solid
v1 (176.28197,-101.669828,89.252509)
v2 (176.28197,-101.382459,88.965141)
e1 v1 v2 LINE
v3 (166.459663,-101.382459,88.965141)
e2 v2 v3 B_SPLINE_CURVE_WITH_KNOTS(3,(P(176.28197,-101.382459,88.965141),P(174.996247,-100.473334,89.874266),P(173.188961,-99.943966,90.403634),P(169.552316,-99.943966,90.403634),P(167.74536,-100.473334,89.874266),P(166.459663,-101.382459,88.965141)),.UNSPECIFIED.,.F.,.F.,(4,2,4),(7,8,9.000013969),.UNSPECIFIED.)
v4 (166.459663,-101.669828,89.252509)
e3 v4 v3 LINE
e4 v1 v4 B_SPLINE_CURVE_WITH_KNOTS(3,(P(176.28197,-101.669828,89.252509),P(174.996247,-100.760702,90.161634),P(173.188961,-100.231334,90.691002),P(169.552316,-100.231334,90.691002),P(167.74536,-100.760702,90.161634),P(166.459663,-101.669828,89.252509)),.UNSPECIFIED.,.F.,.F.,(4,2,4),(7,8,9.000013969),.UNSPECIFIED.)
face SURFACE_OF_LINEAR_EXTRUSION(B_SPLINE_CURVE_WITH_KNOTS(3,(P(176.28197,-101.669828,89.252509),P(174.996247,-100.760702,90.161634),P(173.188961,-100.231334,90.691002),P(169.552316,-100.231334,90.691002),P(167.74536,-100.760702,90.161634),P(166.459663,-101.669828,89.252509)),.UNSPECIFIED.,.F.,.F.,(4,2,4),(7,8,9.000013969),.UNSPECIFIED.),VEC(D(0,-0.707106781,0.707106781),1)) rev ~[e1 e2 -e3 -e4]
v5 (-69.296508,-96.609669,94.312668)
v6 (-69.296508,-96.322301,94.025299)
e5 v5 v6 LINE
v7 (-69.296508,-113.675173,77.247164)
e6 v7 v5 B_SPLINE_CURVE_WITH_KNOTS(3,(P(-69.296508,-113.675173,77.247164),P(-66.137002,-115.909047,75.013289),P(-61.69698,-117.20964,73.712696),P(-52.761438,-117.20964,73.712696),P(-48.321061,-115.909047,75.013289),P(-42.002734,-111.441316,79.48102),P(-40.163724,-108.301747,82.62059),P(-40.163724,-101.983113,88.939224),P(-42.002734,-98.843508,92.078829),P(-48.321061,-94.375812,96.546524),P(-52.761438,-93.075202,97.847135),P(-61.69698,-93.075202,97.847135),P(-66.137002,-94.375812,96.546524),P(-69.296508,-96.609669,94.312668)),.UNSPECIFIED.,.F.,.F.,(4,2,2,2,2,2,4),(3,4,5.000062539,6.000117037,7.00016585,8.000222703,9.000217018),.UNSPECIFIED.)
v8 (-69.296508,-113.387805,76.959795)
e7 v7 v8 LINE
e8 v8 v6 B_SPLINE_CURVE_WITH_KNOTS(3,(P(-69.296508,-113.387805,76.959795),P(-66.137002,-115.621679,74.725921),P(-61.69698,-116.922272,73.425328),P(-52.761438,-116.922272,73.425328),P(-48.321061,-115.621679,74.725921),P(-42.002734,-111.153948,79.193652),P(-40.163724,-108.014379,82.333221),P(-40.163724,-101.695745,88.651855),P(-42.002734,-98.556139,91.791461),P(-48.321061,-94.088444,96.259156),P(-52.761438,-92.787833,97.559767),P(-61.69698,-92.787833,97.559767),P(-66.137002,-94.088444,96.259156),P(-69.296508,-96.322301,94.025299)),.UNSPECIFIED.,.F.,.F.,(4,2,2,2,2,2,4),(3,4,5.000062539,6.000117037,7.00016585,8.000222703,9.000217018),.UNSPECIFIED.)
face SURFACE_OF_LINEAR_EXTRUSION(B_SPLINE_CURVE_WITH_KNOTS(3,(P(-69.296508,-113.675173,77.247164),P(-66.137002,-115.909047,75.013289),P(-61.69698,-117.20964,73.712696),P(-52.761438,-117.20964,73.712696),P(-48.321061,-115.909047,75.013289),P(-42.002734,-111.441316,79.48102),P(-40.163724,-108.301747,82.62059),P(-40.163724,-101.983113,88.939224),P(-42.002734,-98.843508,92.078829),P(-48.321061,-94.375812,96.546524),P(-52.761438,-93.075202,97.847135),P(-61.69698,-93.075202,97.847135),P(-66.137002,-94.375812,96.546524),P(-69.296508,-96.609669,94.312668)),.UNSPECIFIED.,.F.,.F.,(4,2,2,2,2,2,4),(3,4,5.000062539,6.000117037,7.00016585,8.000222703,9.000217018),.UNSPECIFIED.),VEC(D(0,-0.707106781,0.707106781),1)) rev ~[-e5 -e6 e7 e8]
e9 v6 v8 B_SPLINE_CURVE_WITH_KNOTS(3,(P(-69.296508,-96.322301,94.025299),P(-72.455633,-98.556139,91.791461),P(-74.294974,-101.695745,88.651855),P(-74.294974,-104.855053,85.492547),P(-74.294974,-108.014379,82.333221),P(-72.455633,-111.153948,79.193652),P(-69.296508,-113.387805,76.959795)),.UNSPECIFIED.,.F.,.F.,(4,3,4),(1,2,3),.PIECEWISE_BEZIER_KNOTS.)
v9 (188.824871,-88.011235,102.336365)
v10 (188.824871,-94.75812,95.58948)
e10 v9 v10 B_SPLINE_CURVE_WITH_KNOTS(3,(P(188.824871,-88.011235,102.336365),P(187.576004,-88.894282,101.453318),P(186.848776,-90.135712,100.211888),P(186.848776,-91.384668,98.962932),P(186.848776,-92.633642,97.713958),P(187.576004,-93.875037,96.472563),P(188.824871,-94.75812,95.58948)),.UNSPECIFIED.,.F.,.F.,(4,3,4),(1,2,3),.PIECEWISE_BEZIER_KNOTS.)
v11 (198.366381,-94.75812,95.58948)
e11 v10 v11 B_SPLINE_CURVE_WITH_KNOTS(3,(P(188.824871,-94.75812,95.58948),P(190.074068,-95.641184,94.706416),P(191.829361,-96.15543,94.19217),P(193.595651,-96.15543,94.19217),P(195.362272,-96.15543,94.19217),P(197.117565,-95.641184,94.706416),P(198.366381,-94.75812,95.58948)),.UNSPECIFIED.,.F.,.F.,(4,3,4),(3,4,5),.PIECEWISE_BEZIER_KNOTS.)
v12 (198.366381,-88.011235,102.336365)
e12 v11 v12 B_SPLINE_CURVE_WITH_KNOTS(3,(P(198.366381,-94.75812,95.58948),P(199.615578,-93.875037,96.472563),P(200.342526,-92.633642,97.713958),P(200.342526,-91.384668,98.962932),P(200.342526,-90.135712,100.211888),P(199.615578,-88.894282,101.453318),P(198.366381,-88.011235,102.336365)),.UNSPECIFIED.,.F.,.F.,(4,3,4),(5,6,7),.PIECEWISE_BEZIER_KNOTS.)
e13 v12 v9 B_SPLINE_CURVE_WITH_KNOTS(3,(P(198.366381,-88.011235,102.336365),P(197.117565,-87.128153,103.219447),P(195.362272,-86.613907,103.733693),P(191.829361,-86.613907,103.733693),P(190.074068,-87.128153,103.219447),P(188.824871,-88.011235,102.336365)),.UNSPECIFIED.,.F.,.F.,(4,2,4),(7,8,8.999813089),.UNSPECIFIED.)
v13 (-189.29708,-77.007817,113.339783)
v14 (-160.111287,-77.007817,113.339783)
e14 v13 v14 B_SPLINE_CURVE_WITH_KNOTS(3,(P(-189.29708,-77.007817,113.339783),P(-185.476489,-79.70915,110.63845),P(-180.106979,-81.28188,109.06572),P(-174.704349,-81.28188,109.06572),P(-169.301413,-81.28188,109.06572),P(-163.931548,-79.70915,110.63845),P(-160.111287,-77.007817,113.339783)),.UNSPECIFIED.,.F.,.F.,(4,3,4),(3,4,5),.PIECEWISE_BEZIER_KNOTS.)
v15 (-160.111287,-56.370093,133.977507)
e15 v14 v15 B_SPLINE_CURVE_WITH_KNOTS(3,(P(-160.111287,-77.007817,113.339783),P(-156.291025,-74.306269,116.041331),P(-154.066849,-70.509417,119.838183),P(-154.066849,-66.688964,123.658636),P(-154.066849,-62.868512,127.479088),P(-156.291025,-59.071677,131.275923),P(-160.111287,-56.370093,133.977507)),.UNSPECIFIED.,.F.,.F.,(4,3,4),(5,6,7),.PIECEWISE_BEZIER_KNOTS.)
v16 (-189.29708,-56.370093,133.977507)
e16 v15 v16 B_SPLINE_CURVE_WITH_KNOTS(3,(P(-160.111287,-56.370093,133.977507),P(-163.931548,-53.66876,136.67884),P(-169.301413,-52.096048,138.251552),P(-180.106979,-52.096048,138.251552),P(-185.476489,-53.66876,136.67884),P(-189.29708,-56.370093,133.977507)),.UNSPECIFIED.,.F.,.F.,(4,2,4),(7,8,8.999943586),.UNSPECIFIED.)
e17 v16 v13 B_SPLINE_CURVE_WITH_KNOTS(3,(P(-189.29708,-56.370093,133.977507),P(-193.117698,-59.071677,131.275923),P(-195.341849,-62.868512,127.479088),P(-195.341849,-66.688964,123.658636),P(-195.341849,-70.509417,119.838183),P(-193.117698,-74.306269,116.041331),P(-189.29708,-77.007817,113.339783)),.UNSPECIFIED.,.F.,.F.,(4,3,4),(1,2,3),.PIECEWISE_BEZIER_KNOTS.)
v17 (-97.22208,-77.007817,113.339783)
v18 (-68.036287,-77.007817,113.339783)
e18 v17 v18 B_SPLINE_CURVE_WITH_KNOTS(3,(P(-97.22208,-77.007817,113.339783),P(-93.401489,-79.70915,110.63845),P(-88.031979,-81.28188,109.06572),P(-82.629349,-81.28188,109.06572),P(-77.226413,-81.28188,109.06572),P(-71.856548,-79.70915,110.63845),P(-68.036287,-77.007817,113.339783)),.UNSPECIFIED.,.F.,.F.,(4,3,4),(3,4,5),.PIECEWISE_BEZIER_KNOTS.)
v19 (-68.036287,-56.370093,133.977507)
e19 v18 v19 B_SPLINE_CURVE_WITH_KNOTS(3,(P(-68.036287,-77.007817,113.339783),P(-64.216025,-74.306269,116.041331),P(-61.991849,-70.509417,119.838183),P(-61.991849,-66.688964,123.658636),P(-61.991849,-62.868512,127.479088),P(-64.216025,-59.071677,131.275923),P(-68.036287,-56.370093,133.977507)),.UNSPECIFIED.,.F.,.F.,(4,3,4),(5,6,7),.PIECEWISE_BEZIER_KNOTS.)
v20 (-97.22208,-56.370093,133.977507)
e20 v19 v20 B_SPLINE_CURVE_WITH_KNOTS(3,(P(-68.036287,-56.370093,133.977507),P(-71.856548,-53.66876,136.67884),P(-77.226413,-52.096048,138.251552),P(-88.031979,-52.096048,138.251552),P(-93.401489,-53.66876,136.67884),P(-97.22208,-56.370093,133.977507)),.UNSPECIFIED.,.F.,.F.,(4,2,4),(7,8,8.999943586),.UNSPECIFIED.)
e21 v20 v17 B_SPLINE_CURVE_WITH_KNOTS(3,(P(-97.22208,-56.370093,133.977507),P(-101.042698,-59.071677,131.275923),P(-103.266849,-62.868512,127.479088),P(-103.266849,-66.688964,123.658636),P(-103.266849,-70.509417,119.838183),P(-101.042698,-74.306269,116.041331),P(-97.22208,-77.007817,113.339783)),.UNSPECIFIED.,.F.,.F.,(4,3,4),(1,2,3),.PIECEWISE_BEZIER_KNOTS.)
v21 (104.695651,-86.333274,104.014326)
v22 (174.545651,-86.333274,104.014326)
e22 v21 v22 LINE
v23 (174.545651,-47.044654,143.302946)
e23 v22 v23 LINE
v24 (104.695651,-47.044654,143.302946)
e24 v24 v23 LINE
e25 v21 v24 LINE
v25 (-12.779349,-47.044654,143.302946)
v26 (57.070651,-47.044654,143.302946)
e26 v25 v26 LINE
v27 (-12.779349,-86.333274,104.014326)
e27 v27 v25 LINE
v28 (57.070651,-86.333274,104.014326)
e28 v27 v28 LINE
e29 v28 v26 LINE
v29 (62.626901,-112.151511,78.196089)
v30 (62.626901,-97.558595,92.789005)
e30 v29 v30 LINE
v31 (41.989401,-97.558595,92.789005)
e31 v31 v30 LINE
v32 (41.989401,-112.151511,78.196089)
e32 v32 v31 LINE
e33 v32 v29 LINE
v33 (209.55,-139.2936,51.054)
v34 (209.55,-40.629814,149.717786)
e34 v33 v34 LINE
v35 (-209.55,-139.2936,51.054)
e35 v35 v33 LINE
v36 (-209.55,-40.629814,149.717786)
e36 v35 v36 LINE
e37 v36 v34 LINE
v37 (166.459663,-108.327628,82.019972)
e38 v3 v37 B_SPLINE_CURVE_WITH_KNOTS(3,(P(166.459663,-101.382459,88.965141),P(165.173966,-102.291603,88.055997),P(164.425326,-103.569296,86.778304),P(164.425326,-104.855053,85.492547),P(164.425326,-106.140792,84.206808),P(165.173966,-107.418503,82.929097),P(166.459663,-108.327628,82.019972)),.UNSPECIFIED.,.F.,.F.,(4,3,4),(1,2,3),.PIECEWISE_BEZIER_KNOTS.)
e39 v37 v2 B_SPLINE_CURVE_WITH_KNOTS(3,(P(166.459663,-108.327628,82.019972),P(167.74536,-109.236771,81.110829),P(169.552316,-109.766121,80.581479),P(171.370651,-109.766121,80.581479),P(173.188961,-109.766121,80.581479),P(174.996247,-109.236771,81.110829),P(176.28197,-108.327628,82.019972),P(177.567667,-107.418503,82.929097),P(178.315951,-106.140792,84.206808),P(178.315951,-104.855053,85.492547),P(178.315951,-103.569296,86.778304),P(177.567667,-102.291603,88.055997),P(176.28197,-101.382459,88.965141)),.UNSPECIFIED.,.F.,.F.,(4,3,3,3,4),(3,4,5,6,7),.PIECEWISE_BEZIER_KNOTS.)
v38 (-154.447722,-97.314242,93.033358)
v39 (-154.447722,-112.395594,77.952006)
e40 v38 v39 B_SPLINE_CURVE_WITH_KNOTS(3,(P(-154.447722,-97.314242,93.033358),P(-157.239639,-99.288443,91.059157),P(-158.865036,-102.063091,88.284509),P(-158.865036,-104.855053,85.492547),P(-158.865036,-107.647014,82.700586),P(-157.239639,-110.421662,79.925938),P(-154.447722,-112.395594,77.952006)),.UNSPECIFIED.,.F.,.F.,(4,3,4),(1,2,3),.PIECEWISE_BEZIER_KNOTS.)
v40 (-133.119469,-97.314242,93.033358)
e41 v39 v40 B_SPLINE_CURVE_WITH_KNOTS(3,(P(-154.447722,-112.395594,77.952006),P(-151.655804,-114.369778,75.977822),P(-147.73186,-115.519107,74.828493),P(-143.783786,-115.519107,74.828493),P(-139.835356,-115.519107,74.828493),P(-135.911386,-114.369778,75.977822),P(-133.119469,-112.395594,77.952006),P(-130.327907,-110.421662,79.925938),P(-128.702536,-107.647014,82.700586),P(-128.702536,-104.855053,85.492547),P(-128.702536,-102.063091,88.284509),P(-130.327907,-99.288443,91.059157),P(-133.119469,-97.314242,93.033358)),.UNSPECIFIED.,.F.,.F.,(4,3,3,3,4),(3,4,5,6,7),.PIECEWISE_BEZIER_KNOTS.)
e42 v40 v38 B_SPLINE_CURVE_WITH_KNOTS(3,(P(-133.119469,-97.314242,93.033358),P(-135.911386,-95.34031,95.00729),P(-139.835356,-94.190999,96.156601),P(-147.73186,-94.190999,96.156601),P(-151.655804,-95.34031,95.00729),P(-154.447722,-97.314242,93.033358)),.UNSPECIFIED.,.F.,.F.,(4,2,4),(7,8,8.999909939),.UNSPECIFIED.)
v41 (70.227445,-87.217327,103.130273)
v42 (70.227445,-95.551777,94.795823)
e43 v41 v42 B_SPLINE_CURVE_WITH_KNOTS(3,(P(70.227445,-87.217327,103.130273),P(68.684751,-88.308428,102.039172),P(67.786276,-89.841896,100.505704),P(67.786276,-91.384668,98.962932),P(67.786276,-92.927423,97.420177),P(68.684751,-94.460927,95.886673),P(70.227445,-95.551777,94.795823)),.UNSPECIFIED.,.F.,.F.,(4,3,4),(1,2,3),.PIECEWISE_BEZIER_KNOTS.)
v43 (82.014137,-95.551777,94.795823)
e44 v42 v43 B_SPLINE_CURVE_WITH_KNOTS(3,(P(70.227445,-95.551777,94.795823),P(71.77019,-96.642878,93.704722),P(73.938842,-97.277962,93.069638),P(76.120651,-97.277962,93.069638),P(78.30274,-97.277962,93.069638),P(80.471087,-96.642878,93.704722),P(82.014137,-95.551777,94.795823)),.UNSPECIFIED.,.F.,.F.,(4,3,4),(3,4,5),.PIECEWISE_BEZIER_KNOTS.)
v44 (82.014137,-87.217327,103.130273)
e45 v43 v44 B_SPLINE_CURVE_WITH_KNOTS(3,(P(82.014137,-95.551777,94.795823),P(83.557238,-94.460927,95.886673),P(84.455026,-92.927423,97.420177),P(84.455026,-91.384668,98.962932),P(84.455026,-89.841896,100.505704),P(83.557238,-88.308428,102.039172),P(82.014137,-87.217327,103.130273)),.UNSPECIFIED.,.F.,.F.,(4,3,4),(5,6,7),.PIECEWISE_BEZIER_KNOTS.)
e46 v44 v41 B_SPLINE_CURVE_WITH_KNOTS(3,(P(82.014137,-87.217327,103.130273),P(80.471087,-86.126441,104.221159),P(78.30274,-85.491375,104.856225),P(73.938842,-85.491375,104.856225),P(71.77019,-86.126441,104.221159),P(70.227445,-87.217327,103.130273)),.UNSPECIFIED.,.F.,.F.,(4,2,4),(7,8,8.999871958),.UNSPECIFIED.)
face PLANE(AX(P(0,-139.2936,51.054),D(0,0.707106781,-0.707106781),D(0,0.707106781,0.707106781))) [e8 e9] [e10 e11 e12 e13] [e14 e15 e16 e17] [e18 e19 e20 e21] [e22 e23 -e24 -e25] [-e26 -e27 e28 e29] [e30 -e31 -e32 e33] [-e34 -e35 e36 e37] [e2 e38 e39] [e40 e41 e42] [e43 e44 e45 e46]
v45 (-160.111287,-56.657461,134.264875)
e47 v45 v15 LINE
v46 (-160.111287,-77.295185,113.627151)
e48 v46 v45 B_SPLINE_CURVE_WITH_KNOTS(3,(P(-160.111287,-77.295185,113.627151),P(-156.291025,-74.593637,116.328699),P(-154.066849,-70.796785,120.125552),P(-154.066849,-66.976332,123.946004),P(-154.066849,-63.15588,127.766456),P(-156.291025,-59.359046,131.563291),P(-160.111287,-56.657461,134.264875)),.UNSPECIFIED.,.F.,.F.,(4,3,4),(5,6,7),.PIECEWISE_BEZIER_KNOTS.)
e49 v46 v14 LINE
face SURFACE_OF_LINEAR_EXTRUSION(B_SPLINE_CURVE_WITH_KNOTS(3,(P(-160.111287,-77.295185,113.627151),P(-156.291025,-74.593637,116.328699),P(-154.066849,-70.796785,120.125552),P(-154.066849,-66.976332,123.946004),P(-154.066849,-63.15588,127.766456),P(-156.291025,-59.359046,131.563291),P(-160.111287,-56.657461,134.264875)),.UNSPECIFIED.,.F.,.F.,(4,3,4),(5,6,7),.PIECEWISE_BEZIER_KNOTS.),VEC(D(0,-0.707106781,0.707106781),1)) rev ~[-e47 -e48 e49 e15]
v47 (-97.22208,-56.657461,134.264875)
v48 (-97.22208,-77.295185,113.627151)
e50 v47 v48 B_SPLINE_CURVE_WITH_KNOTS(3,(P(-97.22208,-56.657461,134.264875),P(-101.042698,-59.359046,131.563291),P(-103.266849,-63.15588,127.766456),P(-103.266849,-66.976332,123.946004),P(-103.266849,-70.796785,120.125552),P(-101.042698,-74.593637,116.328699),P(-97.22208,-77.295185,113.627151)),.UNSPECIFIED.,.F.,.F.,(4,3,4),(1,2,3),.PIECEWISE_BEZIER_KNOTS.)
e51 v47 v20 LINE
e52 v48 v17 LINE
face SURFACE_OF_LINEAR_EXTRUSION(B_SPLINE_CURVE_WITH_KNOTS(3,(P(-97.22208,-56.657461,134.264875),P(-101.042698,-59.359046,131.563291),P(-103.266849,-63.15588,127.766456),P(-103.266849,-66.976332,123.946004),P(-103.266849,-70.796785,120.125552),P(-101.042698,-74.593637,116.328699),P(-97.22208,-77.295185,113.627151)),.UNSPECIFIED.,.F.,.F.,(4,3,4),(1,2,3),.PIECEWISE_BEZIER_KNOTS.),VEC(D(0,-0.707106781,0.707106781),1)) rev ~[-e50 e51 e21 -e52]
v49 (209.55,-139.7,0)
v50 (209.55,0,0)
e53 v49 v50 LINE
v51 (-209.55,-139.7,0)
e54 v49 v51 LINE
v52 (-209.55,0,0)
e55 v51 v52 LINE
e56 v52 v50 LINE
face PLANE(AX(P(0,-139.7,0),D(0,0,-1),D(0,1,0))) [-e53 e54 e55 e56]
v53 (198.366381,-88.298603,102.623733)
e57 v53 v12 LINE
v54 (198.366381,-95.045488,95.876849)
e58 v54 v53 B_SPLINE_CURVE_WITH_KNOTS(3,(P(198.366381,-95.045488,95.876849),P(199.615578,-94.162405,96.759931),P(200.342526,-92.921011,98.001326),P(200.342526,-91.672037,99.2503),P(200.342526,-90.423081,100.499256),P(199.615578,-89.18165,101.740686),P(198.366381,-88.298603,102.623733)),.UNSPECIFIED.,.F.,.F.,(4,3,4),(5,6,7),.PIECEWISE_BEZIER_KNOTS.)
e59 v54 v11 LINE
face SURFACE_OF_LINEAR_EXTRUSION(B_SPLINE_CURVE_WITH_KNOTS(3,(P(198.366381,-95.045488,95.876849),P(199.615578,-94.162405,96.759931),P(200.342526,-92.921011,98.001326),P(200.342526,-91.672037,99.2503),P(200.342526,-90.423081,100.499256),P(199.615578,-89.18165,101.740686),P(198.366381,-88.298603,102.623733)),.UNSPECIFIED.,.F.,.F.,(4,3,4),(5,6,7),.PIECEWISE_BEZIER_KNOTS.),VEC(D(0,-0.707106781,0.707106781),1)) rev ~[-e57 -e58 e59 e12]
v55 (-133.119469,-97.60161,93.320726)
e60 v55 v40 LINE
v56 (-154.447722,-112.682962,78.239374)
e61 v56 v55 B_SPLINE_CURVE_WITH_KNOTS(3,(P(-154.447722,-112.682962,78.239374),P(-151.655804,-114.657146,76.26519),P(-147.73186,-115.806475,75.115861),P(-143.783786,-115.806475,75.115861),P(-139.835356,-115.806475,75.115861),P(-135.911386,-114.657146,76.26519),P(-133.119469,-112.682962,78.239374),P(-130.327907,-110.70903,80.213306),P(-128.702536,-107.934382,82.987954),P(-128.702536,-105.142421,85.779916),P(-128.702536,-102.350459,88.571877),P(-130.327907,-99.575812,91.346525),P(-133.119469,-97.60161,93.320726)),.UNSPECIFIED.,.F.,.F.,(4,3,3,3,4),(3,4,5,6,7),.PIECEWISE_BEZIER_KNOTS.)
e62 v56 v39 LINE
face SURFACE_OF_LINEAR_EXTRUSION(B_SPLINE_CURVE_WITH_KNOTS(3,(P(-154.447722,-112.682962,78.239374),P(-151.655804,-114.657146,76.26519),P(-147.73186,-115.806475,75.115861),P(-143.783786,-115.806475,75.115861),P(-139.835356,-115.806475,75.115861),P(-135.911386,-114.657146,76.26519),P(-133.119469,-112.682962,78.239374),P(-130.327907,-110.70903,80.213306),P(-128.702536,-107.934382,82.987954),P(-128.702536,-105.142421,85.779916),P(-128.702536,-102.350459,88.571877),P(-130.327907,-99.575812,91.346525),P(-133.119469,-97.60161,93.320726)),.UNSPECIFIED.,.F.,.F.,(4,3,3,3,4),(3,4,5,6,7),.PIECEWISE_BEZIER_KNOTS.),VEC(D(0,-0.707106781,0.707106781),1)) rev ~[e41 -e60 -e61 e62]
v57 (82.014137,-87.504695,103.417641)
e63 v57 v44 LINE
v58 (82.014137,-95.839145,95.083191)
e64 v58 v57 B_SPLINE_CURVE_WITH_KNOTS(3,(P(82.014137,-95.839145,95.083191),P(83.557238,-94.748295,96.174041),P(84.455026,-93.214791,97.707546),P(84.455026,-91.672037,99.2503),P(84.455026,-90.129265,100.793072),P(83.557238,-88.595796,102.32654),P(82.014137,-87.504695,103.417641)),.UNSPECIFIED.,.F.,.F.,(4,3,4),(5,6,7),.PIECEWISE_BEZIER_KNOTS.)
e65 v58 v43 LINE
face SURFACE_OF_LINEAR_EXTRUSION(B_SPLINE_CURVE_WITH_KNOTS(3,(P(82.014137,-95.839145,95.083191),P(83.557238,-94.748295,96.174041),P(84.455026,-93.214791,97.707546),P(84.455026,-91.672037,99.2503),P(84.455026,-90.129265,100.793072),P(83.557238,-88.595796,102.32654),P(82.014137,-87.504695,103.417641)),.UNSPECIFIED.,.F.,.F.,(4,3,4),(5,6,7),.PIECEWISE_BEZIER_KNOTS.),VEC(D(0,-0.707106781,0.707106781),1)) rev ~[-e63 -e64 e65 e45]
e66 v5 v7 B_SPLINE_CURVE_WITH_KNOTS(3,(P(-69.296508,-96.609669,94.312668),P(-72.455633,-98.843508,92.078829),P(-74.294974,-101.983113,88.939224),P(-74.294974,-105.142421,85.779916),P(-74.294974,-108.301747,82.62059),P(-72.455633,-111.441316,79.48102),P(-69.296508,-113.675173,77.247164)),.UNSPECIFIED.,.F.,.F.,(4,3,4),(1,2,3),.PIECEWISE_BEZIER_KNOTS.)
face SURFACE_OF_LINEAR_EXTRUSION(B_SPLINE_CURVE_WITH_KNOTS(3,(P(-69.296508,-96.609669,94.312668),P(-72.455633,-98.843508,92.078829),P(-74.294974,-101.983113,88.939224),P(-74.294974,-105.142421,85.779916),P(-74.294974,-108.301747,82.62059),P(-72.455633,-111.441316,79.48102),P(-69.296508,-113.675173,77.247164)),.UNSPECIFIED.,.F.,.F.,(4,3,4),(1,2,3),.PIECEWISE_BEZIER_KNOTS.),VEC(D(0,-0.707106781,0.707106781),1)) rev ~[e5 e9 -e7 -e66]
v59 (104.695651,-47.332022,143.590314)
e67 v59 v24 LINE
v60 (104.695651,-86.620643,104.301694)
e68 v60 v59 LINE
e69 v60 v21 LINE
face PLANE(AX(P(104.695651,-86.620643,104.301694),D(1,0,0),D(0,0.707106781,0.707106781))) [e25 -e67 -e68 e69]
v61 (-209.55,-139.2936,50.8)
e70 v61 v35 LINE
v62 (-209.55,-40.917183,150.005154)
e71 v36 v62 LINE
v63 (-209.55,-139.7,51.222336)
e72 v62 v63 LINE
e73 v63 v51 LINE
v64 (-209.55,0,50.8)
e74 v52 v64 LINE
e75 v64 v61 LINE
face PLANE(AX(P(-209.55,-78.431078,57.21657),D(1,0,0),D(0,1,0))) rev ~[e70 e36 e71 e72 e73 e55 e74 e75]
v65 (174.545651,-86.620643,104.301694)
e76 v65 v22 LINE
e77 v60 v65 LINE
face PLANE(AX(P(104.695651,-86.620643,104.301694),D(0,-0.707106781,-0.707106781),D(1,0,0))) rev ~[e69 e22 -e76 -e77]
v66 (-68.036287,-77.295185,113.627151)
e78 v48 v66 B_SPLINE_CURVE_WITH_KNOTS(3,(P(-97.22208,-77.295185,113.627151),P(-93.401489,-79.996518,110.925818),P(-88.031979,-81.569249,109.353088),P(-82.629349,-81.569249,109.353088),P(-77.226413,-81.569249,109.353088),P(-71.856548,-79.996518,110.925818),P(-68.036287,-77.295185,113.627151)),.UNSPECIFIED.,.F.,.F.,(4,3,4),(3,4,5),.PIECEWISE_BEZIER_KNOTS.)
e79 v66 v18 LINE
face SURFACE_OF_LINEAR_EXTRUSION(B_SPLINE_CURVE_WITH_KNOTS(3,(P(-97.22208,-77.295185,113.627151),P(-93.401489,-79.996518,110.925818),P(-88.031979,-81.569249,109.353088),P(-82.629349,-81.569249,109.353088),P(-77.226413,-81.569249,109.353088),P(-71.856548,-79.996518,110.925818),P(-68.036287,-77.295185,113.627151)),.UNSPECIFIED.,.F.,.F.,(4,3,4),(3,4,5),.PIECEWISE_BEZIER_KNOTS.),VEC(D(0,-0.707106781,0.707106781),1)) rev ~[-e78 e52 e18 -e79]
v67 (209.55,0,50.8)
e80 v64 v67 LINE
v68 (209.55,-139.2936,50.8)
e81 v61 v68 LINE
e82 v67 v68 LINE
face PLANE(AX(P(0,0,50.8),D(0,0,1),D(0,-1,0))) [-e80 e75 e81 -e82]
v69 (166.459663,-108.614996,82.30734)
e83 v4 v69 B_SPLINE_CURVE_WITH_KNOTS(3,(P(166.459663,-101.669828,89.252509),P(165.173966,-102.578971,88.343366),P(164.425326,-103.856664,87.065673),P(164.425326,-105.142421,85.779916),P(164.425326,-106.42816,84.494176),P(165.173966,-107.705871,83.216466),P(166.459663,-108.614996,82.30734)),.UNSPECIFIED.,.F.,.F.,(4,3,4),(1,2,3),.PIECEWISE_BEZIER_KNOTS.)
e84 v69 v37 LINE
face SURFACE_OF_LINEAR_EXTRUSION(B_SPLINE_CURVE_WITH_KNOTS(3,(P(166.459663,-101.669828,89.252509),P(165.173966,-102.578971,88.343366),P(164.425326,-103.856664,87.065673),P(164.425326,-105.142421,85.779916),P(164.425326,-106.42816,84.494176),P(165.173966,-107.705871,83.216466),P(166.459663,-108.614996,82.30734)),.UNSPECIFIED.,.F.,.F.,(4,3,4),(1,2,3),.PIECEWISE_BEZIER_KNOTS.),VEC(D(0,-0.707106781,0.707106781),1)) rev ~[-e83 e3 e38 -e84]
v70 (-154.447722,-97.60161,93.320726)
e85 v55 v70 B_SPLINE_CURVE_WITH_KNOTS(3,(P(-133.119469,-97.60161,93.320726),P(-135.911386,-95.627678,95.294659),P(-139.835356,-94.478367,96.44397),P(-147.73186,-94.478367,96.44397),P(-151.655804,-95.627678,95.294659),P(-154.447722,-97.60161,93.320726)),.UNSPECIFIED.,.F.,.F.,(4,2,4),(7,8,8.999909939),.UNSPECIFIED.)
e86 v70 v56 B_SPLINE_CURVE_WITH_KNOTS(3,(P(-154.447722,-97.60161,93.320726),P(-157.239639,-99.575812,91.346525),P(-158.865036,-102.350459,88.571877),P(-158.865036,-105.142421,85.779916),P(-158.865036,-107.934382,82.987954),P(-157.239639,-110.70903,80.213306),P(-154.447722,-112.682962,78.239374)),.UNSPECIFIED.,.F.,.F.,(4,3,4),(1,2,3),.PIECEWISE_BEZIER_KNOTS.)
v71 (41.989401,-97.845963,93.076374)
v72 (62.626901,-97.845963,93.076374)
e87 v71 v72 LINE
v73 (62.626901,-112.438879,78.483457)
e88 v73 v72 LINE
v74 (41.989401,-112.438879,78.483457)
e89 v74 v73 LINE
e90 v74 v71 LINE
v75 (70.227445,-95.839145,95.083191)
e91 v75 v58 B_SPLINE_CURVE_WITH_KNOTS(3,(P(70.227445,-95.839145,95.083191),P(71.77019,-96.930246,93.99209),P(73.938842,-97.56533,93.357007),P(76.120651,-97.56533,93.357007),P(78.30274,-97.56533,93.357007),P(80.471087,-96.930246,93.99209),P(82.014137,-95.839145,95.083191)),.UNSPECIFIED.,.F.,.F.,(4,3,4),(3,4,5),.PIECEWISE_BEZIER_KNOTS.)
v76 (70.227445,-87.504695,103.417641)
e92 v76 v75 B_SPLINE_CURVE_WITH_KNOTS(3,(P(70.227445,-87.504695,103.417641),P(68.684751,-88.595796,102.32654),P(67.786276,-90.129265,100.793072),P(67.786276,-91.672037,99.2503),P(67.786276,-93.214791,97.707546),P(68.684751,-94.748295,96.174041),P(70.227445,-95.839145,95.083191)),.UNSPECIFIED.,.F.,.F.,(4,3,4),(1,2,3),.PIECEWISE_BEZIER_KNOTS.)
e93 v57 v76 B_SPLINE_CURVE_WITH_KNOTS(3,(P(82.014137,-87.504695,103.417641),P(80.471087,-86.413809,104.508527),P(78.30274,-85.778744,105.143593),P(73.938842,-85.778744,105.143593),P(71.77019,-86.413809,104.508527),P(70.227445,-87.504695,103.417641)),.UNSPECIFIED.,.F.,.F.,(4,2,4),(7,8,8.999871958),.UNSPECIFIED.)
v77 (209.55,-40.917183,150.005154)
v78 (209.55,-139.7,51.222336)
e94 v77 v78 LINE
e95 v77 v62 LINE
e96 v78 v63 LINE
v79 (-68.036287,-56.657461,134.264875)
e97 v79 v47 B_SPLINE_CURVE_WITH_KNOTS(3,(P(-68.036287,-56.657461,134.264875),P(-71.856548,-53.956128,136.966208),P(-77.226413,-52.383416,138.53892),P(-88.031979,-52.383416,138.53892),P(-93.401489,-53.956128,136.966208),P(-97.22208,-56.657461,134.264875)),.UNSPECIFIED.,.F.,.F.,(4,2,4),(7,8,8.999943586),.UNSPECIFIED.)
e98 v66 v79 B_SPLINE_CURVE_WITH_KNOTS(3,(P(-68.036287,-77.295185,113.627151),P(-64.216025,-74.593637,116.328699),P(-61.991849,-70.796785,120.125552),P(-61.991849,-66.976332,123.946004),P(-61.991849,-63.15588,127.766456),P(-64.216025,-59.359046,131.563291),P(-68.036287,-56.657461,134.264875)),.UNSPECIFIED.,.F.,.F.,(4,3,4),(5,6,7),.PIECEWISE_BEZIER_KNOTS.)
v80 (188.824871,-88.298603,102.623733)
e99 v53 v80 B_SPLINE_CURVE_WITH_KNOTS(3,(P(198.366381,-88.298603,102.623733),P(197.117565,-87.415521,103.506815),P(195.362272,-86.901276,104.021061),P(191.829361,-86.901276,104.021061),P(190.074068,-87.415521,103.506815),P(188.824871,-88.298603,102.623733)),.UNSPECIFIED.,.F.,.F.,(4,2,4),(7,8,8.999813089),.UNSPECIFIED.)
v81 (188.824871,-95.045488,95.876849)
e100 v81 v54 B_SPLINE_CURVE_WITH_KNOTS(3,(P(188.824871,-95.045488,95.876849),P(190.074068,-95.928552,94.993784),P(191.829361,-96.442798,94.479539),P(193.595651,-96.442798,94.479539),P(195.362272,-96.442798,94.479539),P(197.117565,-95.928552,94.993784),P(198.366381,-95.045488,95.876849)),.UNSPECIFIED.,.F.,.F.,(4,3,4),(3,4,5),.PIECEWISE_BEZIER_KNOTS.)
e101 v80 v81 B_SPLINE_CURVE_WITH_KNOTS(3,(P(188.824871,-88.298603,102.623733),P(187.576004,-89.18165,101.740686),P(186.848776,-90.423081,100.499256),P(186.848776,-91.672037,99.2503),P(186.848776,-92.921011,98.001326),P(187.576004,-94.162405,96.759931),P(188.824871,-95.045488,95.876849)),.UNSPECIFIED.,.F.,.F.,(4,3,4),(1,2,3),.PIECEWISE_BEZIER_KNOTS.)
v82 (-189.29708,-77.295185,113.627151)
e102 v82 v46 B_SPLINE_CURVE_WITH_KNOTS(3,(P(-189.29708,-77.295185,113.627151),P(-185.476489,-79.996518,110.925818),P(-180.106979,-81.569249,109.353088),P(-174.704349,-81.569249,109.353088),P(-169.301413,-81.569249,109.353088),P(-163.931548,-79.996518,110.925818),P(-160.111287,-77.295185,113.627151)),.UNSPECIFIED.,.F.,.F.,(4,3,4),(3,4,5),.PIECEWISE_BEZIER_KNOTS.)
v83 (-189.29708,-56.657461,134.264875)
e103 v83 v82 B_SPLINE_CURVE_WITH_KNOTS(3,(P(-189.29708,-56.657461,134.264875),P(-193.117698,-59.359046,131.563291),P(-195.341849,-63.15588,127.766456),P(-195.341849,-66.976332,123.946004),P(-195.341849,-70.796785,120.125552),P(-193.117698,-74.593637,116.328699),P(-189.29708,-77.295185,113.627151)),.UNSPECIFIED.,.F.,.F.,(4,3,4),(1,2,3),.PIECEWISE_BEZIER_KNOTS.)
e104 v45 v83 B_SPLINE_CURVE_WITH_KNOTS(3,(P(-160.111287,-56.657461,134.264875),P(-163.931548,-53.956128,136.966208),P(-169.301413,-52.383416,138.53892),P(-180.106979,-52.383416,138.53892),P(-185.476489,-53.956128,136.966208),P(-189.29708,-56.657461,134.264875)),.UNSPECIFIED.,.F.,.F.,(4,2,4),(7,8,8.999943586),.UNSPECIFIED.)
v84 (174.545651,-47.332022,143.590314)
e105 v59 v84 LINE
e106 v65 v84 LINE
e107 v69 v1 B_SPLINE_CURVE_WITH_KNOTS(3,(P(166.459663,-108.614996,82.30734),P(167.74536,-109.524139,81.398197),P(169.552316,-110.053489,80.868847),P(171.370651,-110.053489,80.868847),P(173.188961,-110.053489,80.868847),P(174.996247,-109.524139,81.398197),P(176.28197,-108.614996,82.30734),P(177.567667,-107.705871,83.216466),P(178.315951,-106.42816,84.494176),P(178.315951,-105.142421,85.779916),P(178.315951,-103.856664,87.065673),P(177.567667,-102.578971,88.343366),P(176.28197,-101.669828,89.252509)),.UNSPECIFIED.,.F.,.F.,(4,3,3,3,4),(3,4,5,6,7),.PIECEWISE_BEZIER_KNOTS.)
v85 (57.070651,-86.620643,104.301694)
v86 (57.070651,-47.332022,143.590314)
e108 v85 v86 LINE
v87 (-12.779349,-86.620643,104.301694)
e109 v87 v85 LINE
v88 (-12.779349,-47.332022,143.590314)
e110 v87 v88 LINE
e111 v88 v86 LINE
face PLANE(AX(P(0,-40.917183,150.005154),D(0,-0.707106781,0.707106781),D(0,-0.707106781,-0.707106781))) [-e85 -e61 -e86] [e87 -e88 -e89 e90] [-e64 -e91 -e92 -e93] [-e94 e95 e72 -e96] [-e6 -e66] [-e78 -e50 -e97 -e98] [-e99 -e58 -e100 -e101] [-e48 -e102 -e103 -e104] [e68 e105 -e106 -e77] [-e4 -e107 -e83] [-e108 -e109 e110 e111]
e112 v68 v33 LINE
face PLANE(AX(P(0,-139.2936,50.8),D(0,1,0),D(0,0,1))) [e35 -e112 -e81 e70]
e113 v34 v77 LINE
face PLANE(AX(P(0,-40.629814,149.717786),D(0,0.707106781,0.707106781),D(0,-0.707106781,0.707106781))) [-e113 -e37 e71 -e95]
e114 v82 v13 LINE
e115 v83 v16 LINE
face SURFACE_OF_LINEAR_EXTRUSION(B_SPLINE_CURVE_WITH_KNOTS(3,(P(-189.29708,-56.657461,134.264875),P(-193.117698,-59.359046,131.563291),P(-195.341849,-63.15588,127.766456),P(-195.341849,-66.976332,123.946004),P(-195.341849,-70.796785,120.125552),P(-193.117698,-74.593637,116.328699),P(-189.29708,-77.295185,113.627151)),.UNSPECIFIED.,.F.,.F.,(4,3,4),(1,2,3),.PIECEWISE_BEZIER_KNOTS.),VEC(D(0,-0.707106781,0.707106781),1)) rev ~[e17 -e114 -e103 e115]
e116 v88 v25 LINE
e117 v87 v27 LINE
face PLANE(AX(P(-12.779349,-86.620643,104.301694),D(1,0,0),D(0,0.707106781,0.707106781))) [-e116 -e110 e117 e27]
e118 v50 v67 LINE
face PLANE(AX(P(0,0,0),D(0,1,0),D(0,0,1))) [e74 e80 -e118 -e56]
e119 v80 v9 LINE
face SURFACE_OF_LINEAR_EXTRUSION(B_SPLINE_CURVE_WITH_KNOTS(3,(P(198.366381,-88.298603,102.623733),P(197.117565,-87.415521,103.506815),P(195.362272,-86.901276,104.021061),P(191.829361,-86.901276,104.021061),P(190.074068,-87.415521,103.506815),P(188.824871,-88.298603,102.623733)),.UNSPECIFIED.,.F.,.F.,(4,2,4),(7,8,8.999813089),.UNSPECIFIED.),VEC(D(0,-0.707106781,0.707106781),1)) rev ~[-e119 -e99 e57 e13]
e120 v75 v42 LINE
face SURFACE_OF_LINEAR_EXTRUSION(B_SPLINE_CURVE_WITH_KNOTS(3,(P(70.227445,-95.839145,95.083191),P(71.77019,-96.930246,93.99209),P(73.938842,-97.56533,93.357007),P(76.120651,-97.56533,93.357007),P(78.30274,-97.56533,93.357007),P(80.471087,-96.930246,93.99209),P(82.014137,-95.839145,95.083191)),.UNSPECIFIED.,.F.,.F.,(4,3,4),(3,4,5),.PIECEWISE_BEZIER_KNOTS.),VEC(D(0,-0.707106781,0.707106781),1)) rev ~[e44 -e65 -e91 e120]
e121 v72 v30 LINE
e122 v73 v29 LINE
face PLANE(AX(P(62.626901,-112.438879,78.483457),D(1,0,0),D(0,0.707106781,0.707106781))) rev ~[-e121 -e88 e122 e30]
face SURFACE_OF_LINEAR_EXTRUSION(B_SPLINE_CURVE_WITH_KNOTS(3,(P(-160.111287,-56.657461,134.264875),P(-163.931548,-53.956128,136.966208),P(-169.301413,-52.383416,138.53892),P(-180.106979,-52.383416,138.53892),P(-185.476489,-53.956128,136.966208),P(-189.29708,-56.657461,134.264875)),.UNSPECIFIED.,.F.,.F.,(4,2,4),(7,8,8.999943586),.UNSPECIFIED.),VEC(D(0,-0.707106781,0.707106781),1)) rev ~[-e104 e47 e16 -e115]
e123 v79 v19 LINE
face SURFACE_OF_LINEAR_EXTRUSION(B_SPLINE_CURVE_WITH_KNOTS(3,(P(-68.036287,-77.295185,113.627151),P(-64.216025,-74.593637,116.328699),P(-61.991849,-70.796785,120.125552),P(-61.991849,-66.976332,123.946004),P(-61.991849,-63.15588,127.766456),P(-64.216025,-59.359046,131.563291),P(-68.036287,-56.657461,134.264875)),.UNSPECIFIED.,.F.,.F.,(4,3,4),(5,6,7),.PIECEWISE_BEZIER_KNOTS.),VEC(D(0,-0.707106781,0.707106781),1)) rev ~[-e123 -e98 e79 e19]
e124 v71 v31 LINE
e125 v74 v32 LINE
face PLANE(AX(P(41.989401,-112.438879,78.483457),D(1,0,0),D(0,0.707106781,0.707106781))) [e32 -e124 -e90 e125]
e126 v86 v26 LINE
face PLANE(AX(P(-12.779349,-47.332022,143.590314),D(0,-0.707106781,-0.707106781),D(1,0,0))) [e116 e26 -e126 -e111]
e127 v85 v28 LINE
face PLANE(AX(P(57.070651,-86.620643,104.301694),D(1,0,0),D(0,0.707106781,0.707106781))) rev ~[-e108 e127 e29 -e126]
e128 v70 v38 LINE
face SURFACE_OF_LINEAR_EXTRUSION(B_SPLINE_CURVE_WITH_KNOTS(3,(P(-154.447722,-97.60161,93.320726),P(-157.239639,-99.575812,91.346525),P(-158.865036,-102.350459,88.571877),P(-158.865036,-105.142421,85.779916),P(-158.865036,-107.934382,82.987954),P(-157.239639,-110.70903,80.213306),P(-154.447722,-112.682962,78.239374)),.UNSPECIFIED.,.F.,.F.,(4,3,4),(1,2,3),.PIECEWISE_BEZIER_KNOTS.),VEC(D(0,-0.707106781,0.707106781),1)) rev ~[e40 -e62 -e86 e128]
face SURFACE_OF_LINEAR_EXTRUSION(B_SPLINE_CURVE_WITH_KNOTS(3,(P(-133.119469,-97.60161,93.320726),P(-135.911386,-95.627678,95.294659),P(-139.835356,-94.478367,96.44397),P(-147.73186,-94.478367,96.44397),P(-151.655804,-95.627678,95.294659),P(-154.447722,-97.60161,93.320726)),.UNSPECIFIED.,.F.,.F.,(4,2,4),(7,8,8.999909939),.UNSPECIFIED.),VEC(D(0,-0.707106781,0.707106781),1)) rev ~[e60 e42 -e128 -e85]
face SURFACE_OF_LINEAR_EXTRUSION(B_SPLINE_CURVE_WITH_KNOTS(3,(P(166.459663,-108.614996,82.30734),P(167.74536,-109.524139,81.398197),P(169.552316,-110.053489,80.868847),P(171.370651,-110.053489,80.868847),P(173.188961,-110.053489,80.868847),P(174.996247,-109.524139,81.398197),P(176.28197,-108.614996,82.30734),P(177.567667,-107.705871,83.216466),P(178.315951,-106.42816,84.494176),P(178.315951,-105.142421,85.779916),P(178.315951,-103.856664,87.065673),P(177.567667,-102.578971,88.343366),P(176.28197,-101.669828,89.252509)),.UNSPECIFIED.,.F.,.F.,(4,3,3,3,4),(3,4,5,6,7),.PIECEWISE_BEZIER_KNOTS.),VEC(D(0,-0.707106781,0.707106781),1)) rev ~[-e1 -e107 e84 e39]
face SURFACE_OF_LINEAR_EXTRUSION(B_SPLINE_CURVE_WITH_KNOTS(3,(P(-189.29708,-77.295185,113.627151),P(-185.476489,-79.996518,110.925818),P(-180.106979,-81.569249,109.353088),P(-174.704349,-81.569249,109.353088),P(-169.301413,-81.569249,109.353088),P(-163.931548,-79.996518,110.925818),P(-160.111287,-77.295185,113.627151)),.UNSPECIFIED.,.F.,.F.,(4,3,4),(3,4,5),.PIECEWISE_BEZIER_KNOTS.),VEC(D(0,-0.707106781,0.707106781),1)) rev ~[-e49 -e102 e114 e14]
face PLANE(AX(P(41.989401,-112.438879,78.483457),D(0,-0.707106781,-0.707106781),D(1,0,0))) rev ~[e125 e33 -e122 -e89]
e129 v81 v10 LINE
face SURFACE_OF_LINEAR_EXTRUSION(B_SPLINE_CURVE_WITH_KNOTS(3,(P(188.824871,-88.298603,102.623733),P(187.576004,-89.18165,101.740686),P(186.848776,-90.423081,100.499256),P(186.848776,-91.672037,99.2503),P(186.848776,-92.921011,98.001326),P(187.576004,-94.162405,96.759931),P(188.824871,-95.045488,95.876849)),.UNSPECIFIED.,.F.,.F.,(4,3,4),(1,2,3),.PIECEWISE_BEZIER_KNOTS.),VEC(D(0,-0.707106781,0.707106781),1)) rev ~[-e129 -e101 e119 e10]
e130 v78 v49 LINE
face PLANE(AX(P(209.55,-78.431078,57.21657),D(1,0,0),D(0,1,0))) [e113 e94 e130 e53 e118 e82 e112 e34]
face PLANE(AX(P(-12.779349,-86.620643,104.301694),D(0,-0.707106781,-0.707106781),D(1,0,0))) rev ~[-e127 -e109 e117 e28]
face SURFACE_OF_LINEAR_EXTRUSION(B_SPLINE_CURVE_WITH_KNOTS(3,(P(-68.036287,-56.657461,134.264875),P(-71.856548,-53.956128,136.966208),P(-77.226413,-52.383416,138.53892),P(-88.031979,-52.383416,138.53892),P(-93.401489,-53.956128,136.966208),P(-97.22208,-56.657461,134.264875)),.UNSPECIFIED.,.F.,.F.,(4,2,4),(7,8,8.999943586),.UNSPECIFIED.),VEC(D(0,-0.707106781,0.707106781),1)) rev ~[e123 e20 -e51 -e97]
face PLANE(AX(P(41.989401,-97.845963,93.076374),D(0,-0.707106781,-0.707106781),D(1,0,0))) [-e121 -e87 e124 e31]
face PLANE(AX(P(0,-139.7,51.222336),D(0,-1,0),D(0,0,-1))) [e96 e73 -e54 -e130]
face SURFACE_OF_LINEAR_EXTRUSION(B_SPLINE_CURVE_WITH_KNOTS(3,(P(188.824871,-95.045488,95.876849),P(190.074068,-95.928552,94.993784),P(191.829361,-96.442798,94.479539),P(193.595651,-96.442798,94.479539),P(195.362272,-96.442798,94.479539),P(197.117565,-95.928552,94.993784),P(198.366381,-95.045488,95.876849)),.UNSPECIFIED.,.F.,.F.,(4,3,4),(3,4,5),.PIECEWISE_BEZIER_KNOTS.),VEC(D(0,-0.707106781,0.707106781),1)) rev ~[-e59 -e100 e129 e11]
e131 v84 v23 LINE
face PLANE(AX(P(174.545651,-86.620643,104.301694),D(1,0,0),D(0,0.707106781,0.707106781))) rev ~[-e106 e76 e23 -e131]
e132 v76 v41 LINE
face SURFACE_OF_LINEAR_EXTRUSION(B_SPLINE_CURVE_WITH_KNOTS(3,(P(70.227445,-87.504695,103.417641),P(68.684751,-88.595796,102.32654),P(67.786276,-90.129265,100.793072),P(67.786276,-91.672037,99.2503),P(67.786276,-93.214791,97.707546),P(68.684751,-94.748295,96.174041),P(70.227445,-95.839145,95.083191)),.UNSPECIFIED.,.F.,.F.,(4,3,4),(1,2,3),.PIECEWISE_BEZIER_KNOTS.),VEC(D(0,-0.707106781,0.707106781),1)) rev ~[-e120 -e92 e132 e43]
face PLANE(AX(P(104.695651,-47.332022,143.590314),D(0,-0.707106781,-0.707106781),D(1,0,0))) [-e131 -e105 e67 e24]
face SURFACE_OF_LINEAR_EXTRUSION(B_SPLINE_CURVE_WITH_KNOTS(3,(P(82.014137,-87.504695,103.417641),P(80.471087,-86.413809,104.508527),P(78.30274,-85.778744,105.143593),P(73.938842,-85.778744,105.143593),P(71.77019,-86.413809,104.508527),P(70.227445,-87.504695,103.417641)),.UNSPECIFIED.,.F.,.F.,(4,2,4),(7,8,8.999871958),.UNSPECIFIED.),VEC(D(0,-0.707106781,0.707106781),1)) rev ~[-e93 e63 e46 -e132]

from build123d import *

# Parameters (mm, degrees)
F1_DEPTH = 209.55
F2_W     = 20.6375
F2_H     = 20.6375
F2_W_2   = 69.85
F2_H_2   = 55.5625
F3_DEPTH = 0.4064


# Not quite as in the source:
# - the dataset's text gives a spline's control points without its knots; the knots are read off the source's solid


with BuildPart() as f1:
    # F0 (on Right) → F1 (new body, symmetric)
    with BuildSketch(Plane.YZ):
        Polygon((-139.7, 0), (0, 0), (0, 50.8), (-139.2936, 50.8), (-139.2936, 51.054), (-40.6298144724, 149.7177855276), (-40.9171826682, 150.0051537235), (-139.7, 51.2223363917), align=None)
    extrude(amount=F1_DEPTH, both=True)

    # F2 (on face) → F3 (cut, through all)
    with BuildSketch(Plane(origin=(0, -95.4611681959, 95.4611681959), x_dir=(1, 0, 0), z_dir=(0, -0.7071067812, 0.7071067812))):
        with Locations((52.3081513166, -13.6913588034)):
            Rectangle(F2_W, F2_H)
        with Locations((139.6206513166, 40.2836411966)):
            Rectangle(F2_W_2, F2_H_2)
        with Locations((22.1456513166, 40.2836411966)):
            Rectangle(F2_W_2, F2_H_2)
        with BuildLine():
            add(Edge.make_bspline(
                [(-69.2965076834, -25.7584924034), (-66.1370016834, -28.9176682034), (-61.6969800834, -30.7569838034), (-57.2293486834, -30.7569838034), (-52.7614378834, -30.7569838034), (-48.3210606834, -28.9176682034), (-45.1618848834, -25.7584924034), (-42.0027344834, -22.5993420034), (-40.1637236834, -18.1593204034), (-40.1637236834, -13.6913588034), (-40.1637236834, -9.2234226034), (-42.0027344834, -4.7833502034), (-45.1618848834, -1.6242252034), (-48.3210606834, 1.5349251966), (-52.7614378834, 3.3742661966), (-57.2293486834, 3.3742661966)],
                knots=[3, 3, 3, 3, 4, 4, 4, 5, 5, 5, 6, 6, 6, 7, 7, 7, 8, 8, 8, 8], degree=3))
            add(Edge.make_bspline(
                [(-57.2293486834, 3.3742661966), (-61.6969800834, 3.3742661966), (-66.1370016834, 1.5349251966), (-69.2965076834, -1.6242252034)],
                knots=[0, 0, 0, 0, 1, 1, 1, 1], degree=3))
            add(Edge.make_bspline(
                [(-69.2965076834, -1.6242252034), (-72.4556326834, -4.7833502034), (-74.2949736834, -9.2234226034), (-74.2949736834, -13.6913588034), (-74.2949736834, -18.1593204034), (-72.4556326834, -22.5993420034), (-69.2965076834, -25.7584924034)],
                knots=[1, 1, 1, 1, 2, 2, 2, 3, 3, 3, 3], degree=3))
        make_face()
        with BuildLine():
            add(Edge.make_bspline(
                [(82.0141371166, 11.2521523966), (80.4710871166, 12.7948975966), (78.3027399166, 13.6930161966), (76.1206513166, 13.6930161966)],
                knots=[7, 7, 7, 7, 8, 8, 8, 8], degree=3))
            add(Edge.make_bspline(
                [(76.1206513166, 13.6930161966), (73.9388421166, 13.6930161966), (71.7701901166, 12.7948975966), (70.2274449166, 11.2521523966)],
                knots=[0, 0, 0, 0, 1, 1, 1, 1], degree=3))
            add(Edge.make_bspline(
                [(70.2274449166, 11.2521523966), (68.6847505166, 9.7091023966), (67.7862763166, 7.5404503966), (67.7862763166, 5.3586411966), (67.7862763166, 3.1768573966), (68.6847505166, 1.0081545966), (70.2274449166, -0.5345398034)],
                knots=[1, 1, 1, 1, 2, 2, 2, 3, 3, 3, 3], degree=3))
            add(Edge.make_bspline(
                [(70.2274449166, -0.5345398034), (71.7701901166, -2.0775898034), (73.9388421166, -2.9757338034), (76.1206513166, -2.9757338034), (78.3027399166, -2.9757338034), (80.4710871166, -2.0775898034), (82.0141371166, -0.5345398034)],
                knots=[3, 3, 3, 3, 4, 4, 4, 5, 5, 5, 5], degree=3))
            add(Edge.make_bspline(
                [(82.0141371166, -0.5345398034), (83.5572379166, 1.0081545966), (84.4550263166, 3.1768573966), (84.4550263166, 5.3586411966), (84.4550263166, 7.5404503966), (83.5572379166, 9.7091023966), (82.0141371166, 11.2521523966)],
                knots=[5, 5, 5, 5, 6, 6, 6, 7, 7, 7, 7], degree=3))
        make_face()
        with BuildLine():
            add(Edge.make_bspline(
                [(-68.0362866834, 54.8767285966), (-71.8565482834, 58.6969901966), (-77.2264130834, 60.9211411966), (-82.6293486834, 60.9211411966)],
                knots=[7, 7, 7, 7, 8, 8, 8, 8], degree=3))
            add(Edge.make_bspline(
                [(-82.6293486834, 60.9211411966), (-88.0319794834, 60.9211411966), (-93.4014886834, 58.6969901966), (-97.2220804834, 54.8767285966)],
                knots=[0, 0, 0, 0, 1, 1, 1, 1], degree=3))
            add(Edge.make_bspline(
                [(-97.2220804834, 54.8767285966), (-101.0426976834, 51.0561113966), (-103.2668486834, 45.6865767966), (-103.2668486834, 40.2836411966), (-103.2668486834, 34.8807055966), (-101.0426976834, 29.5111455966), (-97.2220804834, 25.6905791966)],
                knots=[1, 1, 1, 1, 2, 2, 2, 3, 3, 3, 3], degree=3))
            add(Edge.make_bspline(
                [(-97.2220804834, 25.6905791966), (-93.4014886834, 21.8703175966), (-88.0319794834, 19.6461411966), (-82.6293486834, 19.6461411966), (-77.2264130834, 19.6461411966), (-71.8565482834, 21.8703175966), (-68.0362866834, 25.6905791966)],
                knots=[3, 3, 3, 3, 4, 4, 4, 5, 5, 5, 5], degree=3))
            add(Edge.make_bspline(
                [(-68.0362866834, 25.6905791966), (-64.2160250834, 29.5111455966), (-61.9918486834, 34.8807055966), (-61.9918486834, 40.2836411966), (-61.9918486834, 45.6865767966), (-64.2160250834, 51.0561113966), (-68.0362866834, 54.8767285966)],
                knots=[5, 5, 5, 5, 6, 6, 6, 7, 7, 7, 7], degree=3))
        make_face()
        with BuildLine():
            add(Edge.make_bspline(
                [(-160.1112866834, 54.8767285966), (-163.9315482834, 58.6969901966), (-169.3014130834, 60.9211411966), (-174.7043486834, 60.9211411966)],
                knots=[7, 7, 7, 7, 8, 8, 8, 8], degree=3))
            add(Edge.make_bspline(
                [(-174.7043486834, 60.9211411966), (-180.1069794834, 60.9211411966), (-185.4764886834, 58.6969901966), (-189.2970804834, 54.8767285966)],
                knots=[0, 0, 0, 0, 1, 1, 1, 1], degree=3))
            add(Edge.make_bspline(
                [(-189.2970804834, 54.8767285966), (-193.1176976834, 51.0561113966), (-195.3418486834, 45.6865767966), (-195.3418486834, 40.2836411966), (-195.3418486834, 34.8807055966), (-193.1176976834, 29.5111455966), (-189.2970804834, 25.6905791966)],
                knots=[1, 1, 1, 1, 2, 2, 2, 3, 3, 3, 3], degree=3))
            add(Edge.make_bspline(
                [(-189.2970804834, 25.6905791966), (-185.4764886834, 21.8703175966), (-180.1069794834, 19.6461411966), (-174.7043486834, 19.6461411966), (-169.3014130834, 19.6461411966), (-163.9315482834, 21.8703175966), (-160.1112866834, 25.6905791966)],
                knots=[3, 3, 3, 3, 4, 4, 4, 5, 5, 5, 5], degree=3))
            add(Edge.make_bspline(
                [(-160.1112866834, 25.6905791966), (-156.2910250834, 29.5111455966), (-154.0668486834, 34.8807055966), (-154.0668486834, 40.2836411966), (-154.0668486834, 45.6865767966), (-156.2910250834, 51.0561113966), (-160.1112866834, 54.8767285966)],
                knots=[5, 5, 5, 5, 6, 6, 6, 7, 7, 7, 7], degree=3))
        make_face()
        with BuildLine():
            add(Edge.make_bspline(
                [(-133.1194686834, -3.0270418034), (-135.9113858834, -0.2354802034), (-139.8353556834, 1.3898911966), (-143.7837856834, 1.3898911966)],
                knots=[7, 7, 7, 7, 8, 8, 8, 8], degree=3))
            add(Edge.make_bspline(
                [(-143.7837856834, 1.3898911966), (-147.7318600834, 1.3898911966), (-151.6558044834, -0.2354802034), (-154.4477216834, -3.0270418034)],
                knots=[0, 0, 0, 0, 1, 1, 1, 1], degree=3))
            add(Edge.make_bspline(
                [(-154.4477216834, -3.0270418034), (-157.2396388834, -5.8189844034), (-158.8650356834, -9.7429288034), (-158.8650356834, -13.6913588034), (-158.8650356834, -17.6397888034), (-157.2396388834, -21.5637332034), (-154.4477216834, -24.3552948034)],
                knots=[1, 1, 1, 1, 2, 2, 2, 3, 3, 3, 3], degree=3))
            add(Edge.make_bspline(
                [(-154.4477216834, -24.3552948034), (-151.6558044834, -27.1472120034), (-147.7318600834, -28.7726088034), (-143.7837856834, -28.7726088034), (-139.8353556834, -28.7726088034), (-135.9113858834, -27.1472120034), (-133.1194686834, -24.3552948034), (-130.3279070834, -21.5637332034), (-128.7025356834, -17.6397888034), (-128.7025356834, -13.6913588034), (-128.7025356834, -9.7429288034), (-130.3279070834, -5.8189844034), (-133.1194686834, -3.0270418034)],
                knots=[3, 3, 3, 3, 4, 4, 4, 5, 5, 5, 6, 6, 6, 7, 7, 7, 7], degree=3))
        make_face()
        with BuildLine():
            add(Edge.make_bspline(
                [(176.2819699166, -8.7803704034), (174.9962473166, -7.4946732034), (173.1889611166, -6.7460336034), (171.3706513166, -6.7460336034)],
                knots=[7, 7, 7, 7, 8, 8, 8, 8], degree=3))
            add(Edge.make_bspline(
                [(171.3706513166, -6.7460336034), (169.5523161166, -6.7460336034), (167.7453601166, -7.4946732034), (166.4596629166, -8.7803704034)],
                knots=[0, 0, 0, 0, 1, 1, 1, 1], degree=3))
            add(Edge.make_bspline(
                [(166.4596629166, -8.7803704034), (165.1739657166, -10.0660930034), (164.4253261166, -11.8730236034), (164.4253261166, -13.6913588034), (164.4253261166, -15.5096686034), (165.1739657166, -17.3166246034), (166.4596629166, -18.6023218034)],
                knots=[1, 1, 1, 1, 2, 2, 2, 3, 3, 3, 3], degree=3))
            add(Edge.make_bspline(
                [(166.4596629166, -18.6023218034), (167.7453601166, -19.8880444034), (169.5523161166, -20.6366586034), (171.3706513166, -20.6366586034), (173.1889611166, -20.6366586034), (174.9962473166, -19.8880444034), (176.2819699166, -18.6023218034), (177.5676671166, -17.3166246034), (178.3159511166, -15.5096686034), (178.3159511166, -13.6913588034), (178.3159511166, -11.8730236034), (177.5676671166, -10.0660930034), (176.2819699166, -8.7803704034)],
                knots=[3, 3, 3, 3, 4, 4, 4, 5, 5, 5, 6, 6, 6, 7, 7, 7, 7], degree=3))
        make_face()
        with BuildLine():
            add(Edge.make_bspline(
                [(198.3663809166, 10.1293961966), (197.1175645166, 11.3782633966), (195.3622721166, 12.1055161966), (193.5956513166, 12.1055161966)],
                knots=[7, 7, 7, 7, 8, 8, 8, 8], degree=3))
            add(Edge.make_bspline(
                [(193.5956513166, 12.1055161966), (191.8293607166, 12.1055161966), (190.0740683166, 11.3782633966), (188.8248709166, 10.1293961966)],
                knots=[0, 0, 0, 0, 1, 1, 1, 1], degree=3))
            add(Edge.make_bspline(
                [(188.8248709166, 10.1293961966), (187.5760037166, 8.8805797966), (186.8487763166, 7.1249317966), (186.8487763166, 5.3586411966), (186.8487763166, 3.5923251966), (187.5760037166, 1.8367279966), (188.8248709166, 0.5878607966)],
                knots=[1, 1, 1, 1, 2, 2, 2, 3, 3, 3, 3], degree=3))
            add(Edge.make_bspline(
                [(188.8248709166, 0.5878607966), (190.0740683166, -0.6609810034), (191.8293607166, -1.3882338034), (193.5956513166, -1.3882338034), (195.3622721166, -1.3882338034), (197.1175645166, -0.6609810034), (198.3663809166, 0.5878607966)],
                knots=[3, 3, 3, 3, 4, 4, 4, 5, 5, 5, 5], degree=3))
            add(Edge.make_bspline(
                [(198.3663809166, 0.5878607966), (199.6155783166, 1.8367279966), (200.3425263166, 3.5923251966), (200.3425263166, 5.3586411966), (200.3425263166, 7.1249317966), (199.6155783166, 8.8805797966), (198.3663809166, 10.1293961966)],
                knots=[5, 5, 5, 5, 6, 6, 6, 7, 7, 7, 7], degree=3))
        make_face()
    extrude(amount=-F3_DEPTH, mode=Mode.SUBTRACT)


solid = f1.part
